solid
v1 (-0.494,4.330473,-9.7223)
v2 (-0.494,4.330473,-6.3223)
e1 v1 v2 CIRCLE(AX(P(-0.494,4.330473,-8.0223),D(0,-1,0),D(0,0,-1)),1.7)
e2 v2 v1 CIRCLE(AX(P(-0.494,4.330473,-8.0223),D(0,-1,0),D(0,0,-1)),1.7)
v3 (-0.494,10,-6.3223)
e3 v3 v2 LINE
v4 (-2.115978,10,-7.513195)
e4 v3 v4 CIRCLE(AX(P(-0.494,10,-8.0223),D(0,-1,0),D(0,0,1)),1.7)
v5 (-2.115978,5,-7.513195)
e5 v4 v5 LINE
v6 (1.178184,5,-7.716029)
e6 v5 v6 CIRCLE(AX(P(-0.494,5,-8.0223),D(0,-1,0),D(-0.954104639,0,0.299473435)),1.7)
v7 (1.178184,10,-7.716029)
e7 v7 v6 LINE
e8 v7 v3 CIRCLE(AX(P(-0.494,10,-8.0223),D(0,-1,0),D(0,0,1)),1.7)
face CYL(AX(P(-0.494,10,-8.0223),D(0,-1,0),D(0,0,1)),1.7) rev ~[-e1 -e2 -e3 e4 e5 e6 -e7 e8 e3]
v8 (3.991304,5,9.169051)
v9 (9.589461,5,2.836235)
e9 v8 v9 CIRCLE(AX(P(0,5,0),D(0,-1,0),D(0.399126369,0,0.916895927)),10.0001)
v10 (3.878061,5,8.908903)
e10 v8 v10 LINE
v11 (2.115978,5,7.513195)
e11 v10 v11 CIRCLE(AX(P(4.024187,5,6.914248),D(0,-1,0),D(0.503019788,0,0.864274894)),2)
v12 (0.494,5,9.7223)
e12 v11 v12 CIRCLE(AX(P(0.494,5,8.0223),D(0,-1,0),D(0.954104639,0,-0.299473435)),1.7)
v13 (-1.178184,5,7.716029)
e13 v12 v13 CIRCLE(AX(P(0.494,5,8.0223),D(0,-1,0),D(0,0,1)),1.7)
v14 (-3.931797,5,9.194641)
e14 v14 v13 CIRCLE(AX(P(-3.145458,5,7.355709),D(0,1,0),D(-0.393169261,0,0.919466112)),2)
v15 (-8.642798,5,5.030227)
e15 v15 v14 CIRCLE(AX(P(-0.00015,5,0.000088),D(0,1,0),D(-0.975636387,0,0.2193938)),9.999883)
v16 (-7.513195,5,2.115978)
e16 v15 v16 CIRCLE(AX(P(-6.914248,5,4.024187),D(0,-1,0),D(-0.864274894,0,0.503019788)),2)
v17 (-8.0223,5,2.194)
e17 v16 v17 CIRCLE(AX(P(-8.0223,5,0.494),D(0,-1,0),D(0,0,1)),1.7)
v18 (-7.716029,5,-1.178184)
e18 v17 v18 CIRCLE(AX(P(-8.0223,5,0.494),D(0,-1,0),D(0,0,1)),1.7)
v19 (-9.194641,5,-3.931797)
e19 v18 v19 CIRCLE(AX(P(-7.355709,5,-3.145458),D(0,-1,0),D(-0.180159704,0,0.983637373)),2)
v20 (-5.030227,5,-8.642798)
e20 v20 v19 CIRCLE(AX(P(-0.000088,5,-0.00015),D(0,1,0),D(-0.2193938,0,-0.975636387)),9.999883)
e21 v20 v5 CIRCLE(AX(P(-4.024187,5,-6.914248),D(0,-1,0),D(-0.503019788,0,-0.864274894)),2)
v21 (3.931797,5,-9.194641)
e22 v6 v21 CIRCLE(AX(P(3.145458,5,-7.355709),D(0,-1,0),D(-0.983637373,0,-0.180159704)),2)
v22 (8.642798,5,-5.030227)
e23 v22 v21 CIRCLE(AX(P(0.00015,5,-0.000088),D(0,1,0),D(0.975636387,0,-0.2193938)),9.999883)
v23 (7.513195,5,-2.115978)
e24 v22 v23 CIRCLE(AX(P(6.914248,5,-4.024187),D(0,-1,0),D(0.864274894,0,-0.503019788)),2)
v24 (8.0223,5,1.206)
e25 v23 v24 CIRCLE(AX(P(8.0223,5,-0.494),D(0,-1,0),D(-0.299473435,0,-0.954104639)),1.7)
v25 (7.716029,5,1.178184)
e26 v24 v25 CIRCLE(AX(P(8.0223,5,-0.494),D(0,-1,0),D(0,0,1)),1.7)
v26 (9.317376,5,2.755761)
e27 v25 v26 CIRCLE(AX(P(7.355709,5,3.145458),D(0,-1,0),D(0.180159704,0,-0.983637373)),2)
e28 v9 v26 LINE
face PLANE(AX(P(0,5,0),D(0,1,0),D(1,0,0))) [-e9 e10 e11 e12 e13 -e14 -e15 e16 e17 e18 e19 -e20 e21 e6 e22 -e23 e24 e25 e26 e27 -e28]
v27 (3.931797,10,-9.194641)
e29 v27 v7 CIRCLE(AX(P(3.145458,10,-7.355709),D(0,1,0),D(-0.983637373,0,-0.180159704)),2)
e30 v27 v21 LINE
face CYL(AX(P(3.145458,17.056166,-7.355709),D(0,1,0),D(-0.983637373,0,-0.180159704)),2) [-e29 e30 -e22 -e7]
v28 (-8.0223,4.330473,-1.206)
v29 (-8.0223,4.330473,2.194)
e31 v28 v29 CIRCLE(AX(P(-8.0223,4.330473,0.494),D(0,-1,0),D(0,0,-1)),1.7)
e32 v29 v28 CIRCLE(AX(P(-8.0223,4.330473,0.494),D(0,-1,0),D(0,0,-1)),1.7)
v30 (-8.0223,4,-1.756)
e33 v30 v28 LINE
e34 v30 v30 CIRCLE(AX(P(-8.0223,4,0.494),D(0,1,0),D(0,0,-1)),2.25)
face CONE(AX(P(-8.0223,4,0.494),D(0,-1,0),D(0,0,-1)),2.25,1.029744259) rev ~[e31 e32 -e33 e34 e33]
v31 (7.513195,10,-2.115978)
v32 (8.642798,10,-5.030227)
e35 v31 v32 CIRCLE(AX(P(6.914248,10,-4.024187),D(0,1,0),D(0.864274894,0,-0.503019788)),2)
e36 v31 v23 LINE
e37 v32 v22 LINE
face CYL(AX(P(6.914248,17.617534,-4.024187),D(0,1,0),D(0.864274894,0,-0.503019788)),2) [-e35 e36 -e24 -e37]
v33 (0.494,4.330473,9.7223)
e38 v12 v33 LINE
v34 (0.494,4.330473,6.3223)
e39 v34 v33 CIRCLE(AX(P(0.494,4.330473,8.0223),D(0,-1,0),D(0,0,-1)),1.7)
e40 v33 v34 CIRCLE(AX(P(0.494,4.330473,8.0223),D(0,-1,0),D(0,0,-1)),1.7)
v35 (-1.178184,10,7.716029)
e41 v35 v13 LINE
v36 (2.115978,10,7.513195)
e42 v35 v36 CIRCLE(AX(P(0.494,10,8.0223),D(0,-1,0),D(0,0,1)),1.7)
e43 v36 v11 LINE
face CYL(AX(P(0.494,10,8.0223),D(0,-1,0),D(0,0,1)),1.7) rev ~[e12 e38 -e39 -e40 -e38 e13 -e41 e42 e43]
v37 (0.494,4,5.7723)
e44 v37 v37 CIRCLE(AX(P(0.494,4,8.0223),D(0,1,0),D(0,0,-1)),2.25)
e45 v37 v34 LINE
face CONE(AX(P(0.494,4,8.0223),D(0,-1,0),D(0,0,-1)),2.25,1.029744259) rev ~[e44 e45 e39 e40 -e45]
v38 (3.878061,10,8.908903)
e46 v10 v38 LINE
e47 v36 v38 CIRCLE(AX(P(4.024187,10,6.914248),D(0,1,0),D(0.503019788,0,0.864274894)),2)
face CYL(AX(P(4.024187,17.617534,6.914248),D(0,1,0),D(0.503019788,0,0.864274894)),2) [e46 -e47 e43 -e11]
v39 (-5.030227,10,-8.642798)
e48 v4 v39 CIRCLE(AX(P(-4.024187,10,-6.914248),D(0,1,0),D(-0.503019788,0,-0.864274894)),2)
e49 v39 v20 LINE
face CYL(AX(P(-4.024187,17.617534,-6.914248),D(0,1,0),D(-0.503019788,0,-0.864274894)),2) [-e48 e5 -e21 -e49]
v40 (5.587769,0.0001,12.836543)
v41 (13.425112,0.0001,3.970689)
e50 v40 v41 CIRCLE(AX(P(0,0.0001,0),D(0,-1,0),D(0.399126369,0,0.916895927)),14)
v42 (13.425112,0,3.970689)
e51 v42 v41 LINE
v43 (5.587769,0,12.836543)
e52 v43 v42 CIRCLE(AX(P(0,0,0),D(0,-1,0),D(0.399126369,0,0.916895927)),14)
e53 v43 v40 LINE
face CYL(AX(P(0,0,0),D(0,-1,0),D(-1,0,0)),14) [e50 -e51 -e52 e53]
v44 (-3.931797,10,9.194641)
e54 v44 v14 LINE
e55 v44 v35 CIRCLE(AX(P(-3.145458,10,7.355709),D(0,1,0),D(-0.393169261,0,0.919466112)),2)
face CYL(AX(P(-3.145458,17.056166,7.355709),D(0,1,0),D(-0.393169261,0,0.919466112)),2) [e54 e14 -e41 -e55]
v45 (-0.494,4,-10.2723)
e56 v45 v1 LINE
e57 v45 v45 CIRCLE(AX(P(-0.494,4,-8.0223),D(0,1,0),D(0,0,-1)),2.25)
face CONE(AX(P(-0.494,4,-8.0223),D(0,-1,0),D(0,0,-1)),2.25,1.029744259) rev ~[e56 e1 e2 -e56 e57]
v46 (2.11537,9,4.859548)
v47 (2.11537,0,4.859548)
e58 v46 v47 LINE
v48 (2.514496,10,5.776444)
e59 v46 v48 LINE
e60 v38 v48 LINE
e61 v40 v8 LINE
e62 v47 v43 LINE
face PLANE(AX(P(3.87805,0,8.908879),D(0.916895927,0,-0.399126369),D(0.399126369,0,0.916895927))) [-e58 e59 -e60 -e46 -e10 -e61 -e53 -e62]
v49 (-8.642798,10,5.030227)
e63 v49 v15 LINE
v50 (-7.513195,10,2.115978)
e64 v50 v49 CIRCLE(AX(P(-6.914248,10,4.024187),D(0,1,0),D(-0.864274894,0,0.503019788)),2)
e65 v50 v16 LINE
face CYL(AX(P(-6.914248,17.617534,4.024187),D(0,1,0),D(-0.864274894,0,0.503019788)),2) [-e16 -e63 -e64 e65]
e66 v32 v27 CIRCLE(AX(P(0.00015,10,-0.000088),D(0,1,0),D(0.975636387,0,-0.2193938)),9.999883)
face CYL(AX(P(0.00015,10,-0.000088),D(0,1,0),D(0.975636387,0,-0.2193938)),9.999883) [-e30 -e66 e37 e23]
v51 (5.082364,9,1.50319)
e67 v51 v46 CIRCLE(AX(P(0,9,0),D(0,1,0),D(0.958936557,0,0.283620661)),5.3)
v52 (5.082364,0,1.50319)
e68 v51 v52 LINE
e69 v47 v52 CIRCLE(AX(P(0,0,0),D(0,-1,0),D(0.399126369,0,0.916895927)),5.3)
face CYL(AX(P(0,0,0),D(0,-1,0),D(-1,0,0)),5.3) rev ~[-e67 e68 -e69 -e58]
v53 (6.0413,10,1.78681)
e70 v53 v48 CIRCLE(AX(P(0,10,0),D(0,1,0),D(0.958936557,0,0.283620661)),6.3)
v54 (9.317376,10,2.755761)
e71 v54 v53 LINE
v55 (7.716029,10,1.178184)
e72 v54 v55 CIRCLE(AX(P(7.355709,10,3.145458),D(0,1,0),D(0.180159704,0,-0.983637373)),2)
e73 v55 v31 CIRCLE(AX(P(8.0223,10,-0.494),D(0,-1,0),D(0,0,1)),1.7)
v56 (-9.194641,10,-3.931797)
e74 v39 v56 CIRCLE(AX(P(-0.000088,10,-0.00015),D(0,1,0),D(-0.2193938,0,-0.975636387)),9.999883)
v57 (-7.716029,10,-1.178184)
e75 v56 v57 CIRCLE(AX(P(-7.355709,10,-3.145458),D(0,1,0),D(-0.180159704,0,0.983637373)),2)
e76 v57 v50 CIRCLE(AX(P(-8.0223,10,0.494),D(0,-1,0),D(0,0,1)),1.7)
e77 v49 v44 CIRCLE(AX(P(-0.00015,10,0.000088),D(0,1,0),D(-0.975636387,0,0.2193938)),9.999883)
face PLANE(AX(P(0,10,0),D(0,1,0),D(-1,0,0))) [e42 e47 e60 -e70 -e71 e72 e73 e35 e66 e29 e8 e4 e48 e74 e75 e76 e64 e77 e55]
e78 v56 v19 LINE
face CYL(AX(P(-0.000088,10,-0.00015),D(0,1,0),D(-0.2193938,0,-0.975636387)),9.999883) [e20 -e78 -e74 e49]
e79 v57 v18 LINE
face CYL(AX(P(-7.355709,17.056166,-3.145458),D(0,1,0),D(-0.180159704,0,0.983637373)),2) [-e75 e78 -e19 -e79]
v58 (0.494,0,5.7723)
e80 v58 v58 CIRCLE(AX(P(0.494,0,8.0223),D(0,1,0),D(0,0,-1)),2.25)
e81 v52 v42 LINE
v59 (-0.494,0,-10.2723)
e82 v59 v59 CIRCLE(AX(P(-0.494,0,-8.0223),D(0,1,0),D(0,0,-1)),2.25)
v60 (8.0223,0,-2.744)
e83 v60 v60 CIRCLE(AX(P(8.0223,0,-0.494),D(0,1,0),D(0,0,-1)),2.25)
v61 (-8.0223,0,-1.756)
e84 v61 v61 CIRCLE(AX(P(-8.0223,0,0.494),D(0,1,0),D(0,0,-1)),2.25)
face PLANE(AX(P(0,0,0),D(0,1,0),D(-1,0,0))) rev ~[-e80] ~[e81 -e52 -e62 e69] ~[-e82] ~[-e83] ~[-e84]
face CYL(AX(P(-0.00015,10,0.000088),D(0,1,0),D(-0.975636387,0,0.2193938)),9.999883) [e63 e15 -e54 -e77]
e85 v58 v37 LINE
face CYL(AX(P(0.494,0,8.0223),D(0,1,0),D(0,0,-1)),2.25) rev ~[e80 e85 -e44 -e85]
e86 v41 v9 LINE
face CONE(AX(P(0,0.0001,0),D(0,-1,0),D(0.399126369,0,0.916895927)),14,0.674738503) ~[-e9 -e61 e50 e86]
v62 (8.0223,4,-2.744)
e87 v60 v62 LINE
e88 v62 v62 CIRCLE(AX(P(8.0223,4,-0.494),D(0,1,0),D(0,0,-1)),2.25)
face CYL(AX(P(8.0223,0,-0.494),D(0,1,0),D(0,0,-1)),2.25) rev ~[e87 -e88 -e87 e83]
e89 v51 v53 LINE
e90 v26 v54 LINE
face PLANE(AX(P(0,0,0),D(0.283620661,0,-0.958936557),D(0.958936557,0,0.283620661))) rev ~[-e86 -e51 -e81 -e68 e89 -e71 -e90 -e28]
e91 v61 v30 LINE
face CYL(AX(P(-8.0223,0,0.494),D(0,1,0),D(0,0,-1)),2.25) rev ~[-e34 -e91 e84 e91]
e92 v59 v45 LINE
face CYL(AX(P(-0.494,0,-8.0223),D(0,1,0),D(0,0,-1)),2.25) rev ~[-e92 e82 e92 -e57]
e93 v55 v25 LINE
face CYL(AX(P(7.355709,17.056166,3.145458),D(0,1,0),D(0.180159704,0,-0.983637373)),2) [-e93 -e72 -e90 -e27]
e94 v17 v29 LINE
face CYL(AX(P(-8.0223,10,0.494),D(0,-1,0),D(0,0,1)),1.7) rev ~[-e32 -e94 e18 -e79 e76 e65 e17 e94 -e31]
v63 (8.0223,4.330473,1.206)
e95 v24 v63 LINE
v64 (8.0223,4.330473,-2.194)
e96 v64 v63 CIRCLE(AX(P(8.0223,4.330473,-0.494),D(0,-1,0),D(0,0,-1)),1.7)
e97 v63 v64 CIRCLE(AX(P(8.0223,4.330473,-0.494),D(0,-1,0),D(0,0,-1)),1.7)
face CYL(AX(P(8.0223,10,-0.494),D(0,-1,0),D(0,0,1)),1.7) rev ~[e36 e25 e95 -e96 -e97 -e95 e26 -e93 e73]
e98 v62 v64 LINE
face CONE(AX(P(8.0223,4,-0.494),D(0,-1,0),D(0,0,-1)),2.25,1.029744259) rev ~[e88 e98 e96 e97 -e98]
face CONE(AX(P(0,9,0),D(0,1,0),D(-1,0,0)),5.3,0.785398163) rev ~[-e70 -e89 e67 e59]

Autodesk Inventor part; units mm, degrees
ref_plane "YZ Plane" through (0, 0, 0) normal (1, 0, 0) x (0, 1, 0)
ref_plane "XZ Plane" through (0, 0, 0) normal (0, 1, 0) x (-1, 0, 0)
ref_plane "XY Plane" through (0, 0, 0) normal (0, 0, 1) x (1, 0, 0)
sketch "Boceto1" plane through (0, 0, 0) normal (0, 1, 0) x (-1, 0, 0)
  circle A0 centre (0, 0) radius 5.3
  circle A1 centre (0, 0) radius 14
  dimension "d0" = 10.6
  dimension "d1" = 28
extrude "Extrusión1" add sketch "Boceto1" along normal blind 10
sketch "Boceto2" plane through (0, 10, 0) normal (0, 1, 0) x (1, 0, 0)
  circle A0 centre (-0.494, 8.0223) radius 1.425 projected
  circle A1 centre (-0.494, 8.0223) radius 1.425 projected
  circle A2 centre (-8.0223, -0.494) radius 1.425 projected
  circle A3 centre (0.494, -8.0223) radius 1.425 projected
  circle A4 centre (8.0223, 0.494) radius 1.425 projected
  circle A5 centre (0, 0) radius 11 projected
  circle A6 centre (0, 0) radius 1.5 projected
  point P0 (0, 0)
hole "Agujero1" at (-0.494, 10, -8.0223) at (8.0223, 10, -0.494) at (0.494, 10, 8.0223) at (-8.0223, 10, 0.494) direction (0, -1, 0) diameter 3.4 end through all
sketch "Boceto3" plane through (0, 0, 0) normal (0, -1, 0) x (1, 0, 0)
  circle A0 centre (-8.0223, 0.494) radius 1.7 projected
  circle A1 centre (0.494, 8.0223) radius 1.7 projected
  circle A2 centre (8.0223, -0.494) radius 1.7 projected
  circle A3 centre (-0.494, -8.0223) radius 1.7 projected
  circle A4 centre (0, 0) radius 14 projected
  circle A5 centre (0, 0) radius 5.3 projected
hole "Agujero2" at (-0.494, 0, -8.0223) at (-8.0223, 0, 0.494) at (0.494, 0, 8.0223) at (8.0223, 0, -0.494) direction (0, 1, 0) diameter 4.5 depth 4 tip angle 118
sketch "Boceto4" plane through (0, 10, 0) normal (0, 1, 0) x (1, 0, 0)
  circle A0 centre (-0.494, 8.0223) radius 1.425 projected
  circle A1 centre (-8.0223, -0.494) radius 1.425 projected
  circle A2 centre (0.494, -8.0223) radius 1.425 projected
  circle A3 centre (8.0223, 0.494) radius 1.425 projected
  circle A4 centre (0, 0) radius 11 projected
  circle A5 centre (0, 0) radius 5 projected
  line L0 (-9.7564, -2.194) -> (-8.0223, -2.194)
  circle A6 centre (-8.0223, -0.494) radius 1.7 projected
  line L1 (-8.0223, 1.206) -> (-9.927, 1.206)
  line L2 (-1.206, -8.0223) -> (-1.206, -9.927)
  line L3 (2.194, -9.7564) -> (2.194, -8.0223)
  line L4 (8.0223, -1.206) -> (9.927, -1.206)
  line L5 (9.7564, 2.194) -> (8.0223, 2.194)
  line L6 (1.206, 8.0223) -> (1.206, 9.927)
  line L7 (-2.194, 9.7564) -> (-2.194, 8.0223)
  arc A7 (-2.194, 9.7564) -> (-9.927, 1.206) centre (0, 0) ccw
  arc A8 (9.7564, 2.194) -> (1.206, 9.927) centre (0, 0) ccw
  arc A9 (-9.7564, -2.194) -> (-1.206, -9.927) centre (0, 0) ccw
  arc A10 (2.194, -9.7564) -> (9.927, -1.206) centre (0, 0) ccw
  circle A11 centre (-0.494, 8.0223) radius 1.425 projected
  circle A12 centre (-8.0223, -0.494) radius 1.425 projected
  circle A13 centre (0.494, -8.0223) radius 1.425 projected
  circle A14 centre (8.0223, 0.494) radius 1.425 projected
  circle A15 centre (0, 0) radius 11 projected
  circle A16 centre (0, 0) radius 1.5 projected
  circle A17 centre (-0.494, 8.0223) radius 1.425 projected
  circle A18 centre (-8.0223, -0.494) radius 1.425 projected
  circle A19 centre (0.494, -8.0223) radius 1.425 projected
  circle A20 centre (8.0223, 0.494) radius 1.425 projected
  circle A21 centre (0, 0) radius 11 projected
  circle A22 centre (0, 0) radius 5 projected
  circle A23 centre (-0.494, 8.0223) radius 1.425 projected
  circle A24 centre (-8.0223, -0.494) radius 1.425 projected
  circle A25 centre (0.494, -8.0223) radius 1.425 projected
  circle A26 centre (8.0223, 0.494) radius 1.425 projected
  circle A27 centre (0, 0) radius 11 projected
  circle A28 centre (0, 0) radius 5 projected
  circle A29 centre (0.494, -8.0223) radius 1.7 projected
  circle A30 centre (8.0223, 0.494) radius 1.7 projected
  circle A31 centre (-0.494, 8.0223) radius 1.7 projected
  circle A32 centre (0, 0) radius 14 projected
  dimension "d21" = 360
extrude "Extrusión2" cut sketch "Boceto4" against normal blind 5 contours A4 | A32
fillet "Empalme1" radius 2 8 edges at (-9.7564, 7.5, 2.194) (-9.927, 7.5, -1.206) (-2.194, 7.5, -9.7564) (1.206, 7.5, -9.927) (-1.206, 7.5, 9.927) (2.194, 7.5, 9.7564) (9.927, 7.5, 1.206) (9.7564, 7.5, -2.194)
chamfer "Chaflán1" distance 1 angle 45 1 edges at (5.3, 10, 0)
sketch "Boceto5" plane through (0, 0, 0) normal (0, -1, 0) x (1, 0, 0)
  arc A0 (2.116, 7.5132) -> (-1.1782, 7.716) centre (0.494, 8.0223) ccw projected
  arc A1 (-1.1782, 7.716) -> (-3.9318, 9.1946) centre (-3.1455, 7.3557) ccw projected
  arc A2 (-3.9318, 9.1946) -> (-8.6428, 5.0302) centre (0, 0) ccw projected
  arc A3 (-8.6428, 5.0302) -> (-7.5132, 2.116) centre (-6.9142, 4.0242) ccw projected
  arc A4 (-7.5132, 2.116) -> (-7.716, -1.1782) centre (-8.0223, 0.494) ccw projected
  arc A5 (-7.716, -1.1782) -> (-9.1946, -3.9318) centre (-7.3557, -3.1455) ccw projected
  arc A6 (-9.1946, -3.9318) -> (-5.0302, -8.6428) centre (0, 0) ccw projected
  arc A7 (-5.0302, -8.6428) -> (-2.116, -7.5132) centre (-4.0242, -6.9142) ccw projected
  arc A8 (-2.116, -7.5132) -> (1.1782, -7.716) centre (-0.494, -8.0223) ccw projected
  arc A9 (1.1782, -7.716) -> (3.9318, -9.1946) centre (3.1455, -7.3557) ccw projected
  arc A10 (3.9318, -9.1946) -> (8.6428, -5.0302) centre (0, 0) ccw projected
  arc A11 (8.6428, -5.0302) -> (7.5132, -2.116) centre (6.9142, -4.0242) ccw projected
  arc A12 (7.5132, -2.116) -> (7.716, 1.1782) centre (8.0223, -0.494) ccw projected
  arc A13 (7.716, 1.1782) -> (9.1946, 3.9318) centre (7.3557, 3.1455) ccw projected
  arc A14 (9.1946, 3.9318) -> (5.0302, 8.6428) centre (0, 0) ccw projected
  arc A15 (5.0302, 8.6428) -> (2.116, 7.5132) centre (4.0242, 6.9142) ccw projected
  circle A16 centre (0, 0) radius 14 projected
  line L0 (0.494, 8.0223) -> (-0.494, -8.0223)
  line L1 (0, 0) -> (7.2809, 16.7261)
  line L2 (0, 0) -> (19.4725, 5.7593)
  point P0 (13.4251, 3.9707)
  point P1 (5.5878, 12.8365)
  dimension "d40" = 20
  dimension "d41" = 50
extrude "Extrusión3" cut sketch "Boceto5" against normal through all contours L1 A16 L2 A13 A14 A15 | A15 A14 A13 L2 L1
sketch "Boceto6" plane through (0, 10, 0) normal (0, 1, 0) x (1, 0, 0)
  arc A0 (13.4251, -3.9707) -> (5.5878, -12.8365) centre (0, 0) ccw projected
  arc A1 (2.116, -7.5132) -> (3.878, -8.9089) centre (4.0242, -6.9142) ccw projected
  arc A2 (-1.1782, -7.716) -> (2.116, -7.5132) centre (0.494, -8.0223) ccw projected
  arc A3 (-3.9318, -9.1946) -> (-1.1782, -7.716) centre (-3.1455, -7.3557) ccw projected
  arc A4 (-8.6428, -5.0302) -> (-3.9318, -9.1946) centre (0, 0) ccw projected
  arc A5 (-7.5132, -2.116) -> (-8.6428, -5.0302) centre (-6.9142, -4.0242) ccw projected
  arc A6 (-7.716, 1.1782) -> (-7.5132, -2.116) centre (-8.0223, -0.494) ccw projected
  arc A7 (-9.1946, 3.9318) -> (-7.716, 1.1782) centre (-7.3557, 3.1455) ccw projected
  arc A8 (-5.0302, 8.6428) -> (-9.1946, 3.9318) centre (0, 0) ccw projected
  arc A9 (-2.116, 7.5132) -> (-5.0302, 8.6428) centre (-4.0242, 6.9142) ccw projected
  arc A10 (1.1782, 7.716) -> (-2.116, 7.5132) centre (-0.494, 8.0223) ccw projected
  arc A11 (3.9318, 9.1946) -> (1.1782, 7.716) centre (3.1455, 7.3557) ccw projected
  arc A12 (8.6428, 5.0302) -> (3.9318, 9.1946) centre (0, 0) ccw projected
  arc A13 (7.5132, 2.116) -> (8.6428, 5.0302) centre (6.9142, 4.0242) ccw projected
  arc A14 (7.716, -1.1782) -> (7.5132, 2.116) centre (8.0223, 0.494) ccw projected
  arc A15 (9.3173, -2.7557) -> (7.716, -1.1782) centre (7.3557, -3.1455) ccw projected
  circle A16 centre (0, 0) radius 13
  arc A17 (6.0413, -1.7868) -> (2.5145, -5.7764) centre (0, 0) ccw projected
  line L0 (4.1548, -8.9099) -> (-1.0984, 2.3556) projected
  circle A18 centre (0, 0) radius 6.15
  arc A19 (6.0413, -1.7868) -> (2.5145, -5.7764) centre (0, 0) ccw projected
  arc A20 (9.3173, -2.7557) -> (7.716, -1.1782) centre (7.3557, -3.1455) ccw projected
  arc A21 (7.5132, 2.116) -> (7.716, -1.1782) centre (8.0223, 0.494) ccw projected
  arc A22 (7.5132, 2.116) -> (8.6428, 5.0302) centre (6.9142, 4.0242) ccw projected
  arc A23 (8.6428, 5.0302) -> (3.9318, 9.1946) centre (0, 0) ccw projected
  arc A24 (3.9318, 9.1946) -> (1.1782, 7.716) centre (3.1455, 7.3557) ccw projected
  arc A25 (-2.116, 7.5132) -> (1.1782, 7.716) centre (-0.494, 8.0223) ccw projected
  arc A26 (-2.116, 7.5132) -> (-5.0302, 8.6428) centre (-4.0242, 6.9142) ccw projected
  arc A27 (-5.0302, 8.6428) -> (-9.1946, 3.9318) centre (0, 0) ccw projected
  arc A28 (-9.1946, 3.9318) -> (-7.716, 1.1782) centre (-7.3557, 3.1455) ccw projected
  arc A29 (-7.5132, -2.116) -> (-7.716, 1.1782) centre (-8.0223, -0.494) ccw projected
  arc A30 (-7.5132, -2.116) -> (-8.6428, -5.0302) centre (-6.9142, -4.0242) ccw projected
  arc A31 (-8.6428, -5.0302) -> (-3.9318, -9.1946) centre (0, 0) ccw projected
  arc A32 (-3.9318, -9.1946) -> (-1.1782, -7.716) centre (-3.1455, -7.3557) ccw projected
  arc A33 (2.116, -7.5132) -> (-1.1782, -7.716) centre (0.494, -8.0223) ccw projected
  arc A34 (2.116, -7.5132) -> (3.878, -8.9089) centre (4.0242, -6.9142) ccw projected
  line L1 (3.878, -8.9089) -> (2.5145, -5.7764) projected
  line L2 (6.0413, -1.7868) -> (9.3173, -2.7557) projected
  line L3 (5.5878, -12.8365) -> (3.878, -8.9089) projected
  line L4 (9.3173, -2.7557) -> (13.4251, -3.9707) projected
  point P0 (5.494, -11.782)
  point P1 (-6.15, 0)
  point P2 (-6.15, 0)
  point P3 (5.8975, -1.7443)
  point P4 (13, 0)
  point P5 (2.116, -7.5132)
  point P6 (-1.1782, -7.716)
  point P7 (1.1782, 7.716)
  point P8 (7.716, -1.1782)
  point P9 (2.4546, -5.6389)
  point P10 (5.8975, -1.7443)
  point P11 (-1.1782, -7.716)
  point P12 (2.116, -7.5132)
  point P13 (3.878, -8.9089)
  point P14 (3.7118, -8.5269)
  point P15 (1.0369, -6.2141)
  point P16 (9.3173, -2.7557)
  point P17 (7.716, -1.1782)
  point P18 (1.1782, 7.716)
extrude "Extrusión4" [suppressed]
chamfer "Chaflán2" [suppressed]
chamfer "Chaflán3" distance 5 distance2 4 1 edges at (-10.4892, 5, -9.2724) measured on face at (13.7052, 3.3333, 2.858)
properties part number "Polea"
